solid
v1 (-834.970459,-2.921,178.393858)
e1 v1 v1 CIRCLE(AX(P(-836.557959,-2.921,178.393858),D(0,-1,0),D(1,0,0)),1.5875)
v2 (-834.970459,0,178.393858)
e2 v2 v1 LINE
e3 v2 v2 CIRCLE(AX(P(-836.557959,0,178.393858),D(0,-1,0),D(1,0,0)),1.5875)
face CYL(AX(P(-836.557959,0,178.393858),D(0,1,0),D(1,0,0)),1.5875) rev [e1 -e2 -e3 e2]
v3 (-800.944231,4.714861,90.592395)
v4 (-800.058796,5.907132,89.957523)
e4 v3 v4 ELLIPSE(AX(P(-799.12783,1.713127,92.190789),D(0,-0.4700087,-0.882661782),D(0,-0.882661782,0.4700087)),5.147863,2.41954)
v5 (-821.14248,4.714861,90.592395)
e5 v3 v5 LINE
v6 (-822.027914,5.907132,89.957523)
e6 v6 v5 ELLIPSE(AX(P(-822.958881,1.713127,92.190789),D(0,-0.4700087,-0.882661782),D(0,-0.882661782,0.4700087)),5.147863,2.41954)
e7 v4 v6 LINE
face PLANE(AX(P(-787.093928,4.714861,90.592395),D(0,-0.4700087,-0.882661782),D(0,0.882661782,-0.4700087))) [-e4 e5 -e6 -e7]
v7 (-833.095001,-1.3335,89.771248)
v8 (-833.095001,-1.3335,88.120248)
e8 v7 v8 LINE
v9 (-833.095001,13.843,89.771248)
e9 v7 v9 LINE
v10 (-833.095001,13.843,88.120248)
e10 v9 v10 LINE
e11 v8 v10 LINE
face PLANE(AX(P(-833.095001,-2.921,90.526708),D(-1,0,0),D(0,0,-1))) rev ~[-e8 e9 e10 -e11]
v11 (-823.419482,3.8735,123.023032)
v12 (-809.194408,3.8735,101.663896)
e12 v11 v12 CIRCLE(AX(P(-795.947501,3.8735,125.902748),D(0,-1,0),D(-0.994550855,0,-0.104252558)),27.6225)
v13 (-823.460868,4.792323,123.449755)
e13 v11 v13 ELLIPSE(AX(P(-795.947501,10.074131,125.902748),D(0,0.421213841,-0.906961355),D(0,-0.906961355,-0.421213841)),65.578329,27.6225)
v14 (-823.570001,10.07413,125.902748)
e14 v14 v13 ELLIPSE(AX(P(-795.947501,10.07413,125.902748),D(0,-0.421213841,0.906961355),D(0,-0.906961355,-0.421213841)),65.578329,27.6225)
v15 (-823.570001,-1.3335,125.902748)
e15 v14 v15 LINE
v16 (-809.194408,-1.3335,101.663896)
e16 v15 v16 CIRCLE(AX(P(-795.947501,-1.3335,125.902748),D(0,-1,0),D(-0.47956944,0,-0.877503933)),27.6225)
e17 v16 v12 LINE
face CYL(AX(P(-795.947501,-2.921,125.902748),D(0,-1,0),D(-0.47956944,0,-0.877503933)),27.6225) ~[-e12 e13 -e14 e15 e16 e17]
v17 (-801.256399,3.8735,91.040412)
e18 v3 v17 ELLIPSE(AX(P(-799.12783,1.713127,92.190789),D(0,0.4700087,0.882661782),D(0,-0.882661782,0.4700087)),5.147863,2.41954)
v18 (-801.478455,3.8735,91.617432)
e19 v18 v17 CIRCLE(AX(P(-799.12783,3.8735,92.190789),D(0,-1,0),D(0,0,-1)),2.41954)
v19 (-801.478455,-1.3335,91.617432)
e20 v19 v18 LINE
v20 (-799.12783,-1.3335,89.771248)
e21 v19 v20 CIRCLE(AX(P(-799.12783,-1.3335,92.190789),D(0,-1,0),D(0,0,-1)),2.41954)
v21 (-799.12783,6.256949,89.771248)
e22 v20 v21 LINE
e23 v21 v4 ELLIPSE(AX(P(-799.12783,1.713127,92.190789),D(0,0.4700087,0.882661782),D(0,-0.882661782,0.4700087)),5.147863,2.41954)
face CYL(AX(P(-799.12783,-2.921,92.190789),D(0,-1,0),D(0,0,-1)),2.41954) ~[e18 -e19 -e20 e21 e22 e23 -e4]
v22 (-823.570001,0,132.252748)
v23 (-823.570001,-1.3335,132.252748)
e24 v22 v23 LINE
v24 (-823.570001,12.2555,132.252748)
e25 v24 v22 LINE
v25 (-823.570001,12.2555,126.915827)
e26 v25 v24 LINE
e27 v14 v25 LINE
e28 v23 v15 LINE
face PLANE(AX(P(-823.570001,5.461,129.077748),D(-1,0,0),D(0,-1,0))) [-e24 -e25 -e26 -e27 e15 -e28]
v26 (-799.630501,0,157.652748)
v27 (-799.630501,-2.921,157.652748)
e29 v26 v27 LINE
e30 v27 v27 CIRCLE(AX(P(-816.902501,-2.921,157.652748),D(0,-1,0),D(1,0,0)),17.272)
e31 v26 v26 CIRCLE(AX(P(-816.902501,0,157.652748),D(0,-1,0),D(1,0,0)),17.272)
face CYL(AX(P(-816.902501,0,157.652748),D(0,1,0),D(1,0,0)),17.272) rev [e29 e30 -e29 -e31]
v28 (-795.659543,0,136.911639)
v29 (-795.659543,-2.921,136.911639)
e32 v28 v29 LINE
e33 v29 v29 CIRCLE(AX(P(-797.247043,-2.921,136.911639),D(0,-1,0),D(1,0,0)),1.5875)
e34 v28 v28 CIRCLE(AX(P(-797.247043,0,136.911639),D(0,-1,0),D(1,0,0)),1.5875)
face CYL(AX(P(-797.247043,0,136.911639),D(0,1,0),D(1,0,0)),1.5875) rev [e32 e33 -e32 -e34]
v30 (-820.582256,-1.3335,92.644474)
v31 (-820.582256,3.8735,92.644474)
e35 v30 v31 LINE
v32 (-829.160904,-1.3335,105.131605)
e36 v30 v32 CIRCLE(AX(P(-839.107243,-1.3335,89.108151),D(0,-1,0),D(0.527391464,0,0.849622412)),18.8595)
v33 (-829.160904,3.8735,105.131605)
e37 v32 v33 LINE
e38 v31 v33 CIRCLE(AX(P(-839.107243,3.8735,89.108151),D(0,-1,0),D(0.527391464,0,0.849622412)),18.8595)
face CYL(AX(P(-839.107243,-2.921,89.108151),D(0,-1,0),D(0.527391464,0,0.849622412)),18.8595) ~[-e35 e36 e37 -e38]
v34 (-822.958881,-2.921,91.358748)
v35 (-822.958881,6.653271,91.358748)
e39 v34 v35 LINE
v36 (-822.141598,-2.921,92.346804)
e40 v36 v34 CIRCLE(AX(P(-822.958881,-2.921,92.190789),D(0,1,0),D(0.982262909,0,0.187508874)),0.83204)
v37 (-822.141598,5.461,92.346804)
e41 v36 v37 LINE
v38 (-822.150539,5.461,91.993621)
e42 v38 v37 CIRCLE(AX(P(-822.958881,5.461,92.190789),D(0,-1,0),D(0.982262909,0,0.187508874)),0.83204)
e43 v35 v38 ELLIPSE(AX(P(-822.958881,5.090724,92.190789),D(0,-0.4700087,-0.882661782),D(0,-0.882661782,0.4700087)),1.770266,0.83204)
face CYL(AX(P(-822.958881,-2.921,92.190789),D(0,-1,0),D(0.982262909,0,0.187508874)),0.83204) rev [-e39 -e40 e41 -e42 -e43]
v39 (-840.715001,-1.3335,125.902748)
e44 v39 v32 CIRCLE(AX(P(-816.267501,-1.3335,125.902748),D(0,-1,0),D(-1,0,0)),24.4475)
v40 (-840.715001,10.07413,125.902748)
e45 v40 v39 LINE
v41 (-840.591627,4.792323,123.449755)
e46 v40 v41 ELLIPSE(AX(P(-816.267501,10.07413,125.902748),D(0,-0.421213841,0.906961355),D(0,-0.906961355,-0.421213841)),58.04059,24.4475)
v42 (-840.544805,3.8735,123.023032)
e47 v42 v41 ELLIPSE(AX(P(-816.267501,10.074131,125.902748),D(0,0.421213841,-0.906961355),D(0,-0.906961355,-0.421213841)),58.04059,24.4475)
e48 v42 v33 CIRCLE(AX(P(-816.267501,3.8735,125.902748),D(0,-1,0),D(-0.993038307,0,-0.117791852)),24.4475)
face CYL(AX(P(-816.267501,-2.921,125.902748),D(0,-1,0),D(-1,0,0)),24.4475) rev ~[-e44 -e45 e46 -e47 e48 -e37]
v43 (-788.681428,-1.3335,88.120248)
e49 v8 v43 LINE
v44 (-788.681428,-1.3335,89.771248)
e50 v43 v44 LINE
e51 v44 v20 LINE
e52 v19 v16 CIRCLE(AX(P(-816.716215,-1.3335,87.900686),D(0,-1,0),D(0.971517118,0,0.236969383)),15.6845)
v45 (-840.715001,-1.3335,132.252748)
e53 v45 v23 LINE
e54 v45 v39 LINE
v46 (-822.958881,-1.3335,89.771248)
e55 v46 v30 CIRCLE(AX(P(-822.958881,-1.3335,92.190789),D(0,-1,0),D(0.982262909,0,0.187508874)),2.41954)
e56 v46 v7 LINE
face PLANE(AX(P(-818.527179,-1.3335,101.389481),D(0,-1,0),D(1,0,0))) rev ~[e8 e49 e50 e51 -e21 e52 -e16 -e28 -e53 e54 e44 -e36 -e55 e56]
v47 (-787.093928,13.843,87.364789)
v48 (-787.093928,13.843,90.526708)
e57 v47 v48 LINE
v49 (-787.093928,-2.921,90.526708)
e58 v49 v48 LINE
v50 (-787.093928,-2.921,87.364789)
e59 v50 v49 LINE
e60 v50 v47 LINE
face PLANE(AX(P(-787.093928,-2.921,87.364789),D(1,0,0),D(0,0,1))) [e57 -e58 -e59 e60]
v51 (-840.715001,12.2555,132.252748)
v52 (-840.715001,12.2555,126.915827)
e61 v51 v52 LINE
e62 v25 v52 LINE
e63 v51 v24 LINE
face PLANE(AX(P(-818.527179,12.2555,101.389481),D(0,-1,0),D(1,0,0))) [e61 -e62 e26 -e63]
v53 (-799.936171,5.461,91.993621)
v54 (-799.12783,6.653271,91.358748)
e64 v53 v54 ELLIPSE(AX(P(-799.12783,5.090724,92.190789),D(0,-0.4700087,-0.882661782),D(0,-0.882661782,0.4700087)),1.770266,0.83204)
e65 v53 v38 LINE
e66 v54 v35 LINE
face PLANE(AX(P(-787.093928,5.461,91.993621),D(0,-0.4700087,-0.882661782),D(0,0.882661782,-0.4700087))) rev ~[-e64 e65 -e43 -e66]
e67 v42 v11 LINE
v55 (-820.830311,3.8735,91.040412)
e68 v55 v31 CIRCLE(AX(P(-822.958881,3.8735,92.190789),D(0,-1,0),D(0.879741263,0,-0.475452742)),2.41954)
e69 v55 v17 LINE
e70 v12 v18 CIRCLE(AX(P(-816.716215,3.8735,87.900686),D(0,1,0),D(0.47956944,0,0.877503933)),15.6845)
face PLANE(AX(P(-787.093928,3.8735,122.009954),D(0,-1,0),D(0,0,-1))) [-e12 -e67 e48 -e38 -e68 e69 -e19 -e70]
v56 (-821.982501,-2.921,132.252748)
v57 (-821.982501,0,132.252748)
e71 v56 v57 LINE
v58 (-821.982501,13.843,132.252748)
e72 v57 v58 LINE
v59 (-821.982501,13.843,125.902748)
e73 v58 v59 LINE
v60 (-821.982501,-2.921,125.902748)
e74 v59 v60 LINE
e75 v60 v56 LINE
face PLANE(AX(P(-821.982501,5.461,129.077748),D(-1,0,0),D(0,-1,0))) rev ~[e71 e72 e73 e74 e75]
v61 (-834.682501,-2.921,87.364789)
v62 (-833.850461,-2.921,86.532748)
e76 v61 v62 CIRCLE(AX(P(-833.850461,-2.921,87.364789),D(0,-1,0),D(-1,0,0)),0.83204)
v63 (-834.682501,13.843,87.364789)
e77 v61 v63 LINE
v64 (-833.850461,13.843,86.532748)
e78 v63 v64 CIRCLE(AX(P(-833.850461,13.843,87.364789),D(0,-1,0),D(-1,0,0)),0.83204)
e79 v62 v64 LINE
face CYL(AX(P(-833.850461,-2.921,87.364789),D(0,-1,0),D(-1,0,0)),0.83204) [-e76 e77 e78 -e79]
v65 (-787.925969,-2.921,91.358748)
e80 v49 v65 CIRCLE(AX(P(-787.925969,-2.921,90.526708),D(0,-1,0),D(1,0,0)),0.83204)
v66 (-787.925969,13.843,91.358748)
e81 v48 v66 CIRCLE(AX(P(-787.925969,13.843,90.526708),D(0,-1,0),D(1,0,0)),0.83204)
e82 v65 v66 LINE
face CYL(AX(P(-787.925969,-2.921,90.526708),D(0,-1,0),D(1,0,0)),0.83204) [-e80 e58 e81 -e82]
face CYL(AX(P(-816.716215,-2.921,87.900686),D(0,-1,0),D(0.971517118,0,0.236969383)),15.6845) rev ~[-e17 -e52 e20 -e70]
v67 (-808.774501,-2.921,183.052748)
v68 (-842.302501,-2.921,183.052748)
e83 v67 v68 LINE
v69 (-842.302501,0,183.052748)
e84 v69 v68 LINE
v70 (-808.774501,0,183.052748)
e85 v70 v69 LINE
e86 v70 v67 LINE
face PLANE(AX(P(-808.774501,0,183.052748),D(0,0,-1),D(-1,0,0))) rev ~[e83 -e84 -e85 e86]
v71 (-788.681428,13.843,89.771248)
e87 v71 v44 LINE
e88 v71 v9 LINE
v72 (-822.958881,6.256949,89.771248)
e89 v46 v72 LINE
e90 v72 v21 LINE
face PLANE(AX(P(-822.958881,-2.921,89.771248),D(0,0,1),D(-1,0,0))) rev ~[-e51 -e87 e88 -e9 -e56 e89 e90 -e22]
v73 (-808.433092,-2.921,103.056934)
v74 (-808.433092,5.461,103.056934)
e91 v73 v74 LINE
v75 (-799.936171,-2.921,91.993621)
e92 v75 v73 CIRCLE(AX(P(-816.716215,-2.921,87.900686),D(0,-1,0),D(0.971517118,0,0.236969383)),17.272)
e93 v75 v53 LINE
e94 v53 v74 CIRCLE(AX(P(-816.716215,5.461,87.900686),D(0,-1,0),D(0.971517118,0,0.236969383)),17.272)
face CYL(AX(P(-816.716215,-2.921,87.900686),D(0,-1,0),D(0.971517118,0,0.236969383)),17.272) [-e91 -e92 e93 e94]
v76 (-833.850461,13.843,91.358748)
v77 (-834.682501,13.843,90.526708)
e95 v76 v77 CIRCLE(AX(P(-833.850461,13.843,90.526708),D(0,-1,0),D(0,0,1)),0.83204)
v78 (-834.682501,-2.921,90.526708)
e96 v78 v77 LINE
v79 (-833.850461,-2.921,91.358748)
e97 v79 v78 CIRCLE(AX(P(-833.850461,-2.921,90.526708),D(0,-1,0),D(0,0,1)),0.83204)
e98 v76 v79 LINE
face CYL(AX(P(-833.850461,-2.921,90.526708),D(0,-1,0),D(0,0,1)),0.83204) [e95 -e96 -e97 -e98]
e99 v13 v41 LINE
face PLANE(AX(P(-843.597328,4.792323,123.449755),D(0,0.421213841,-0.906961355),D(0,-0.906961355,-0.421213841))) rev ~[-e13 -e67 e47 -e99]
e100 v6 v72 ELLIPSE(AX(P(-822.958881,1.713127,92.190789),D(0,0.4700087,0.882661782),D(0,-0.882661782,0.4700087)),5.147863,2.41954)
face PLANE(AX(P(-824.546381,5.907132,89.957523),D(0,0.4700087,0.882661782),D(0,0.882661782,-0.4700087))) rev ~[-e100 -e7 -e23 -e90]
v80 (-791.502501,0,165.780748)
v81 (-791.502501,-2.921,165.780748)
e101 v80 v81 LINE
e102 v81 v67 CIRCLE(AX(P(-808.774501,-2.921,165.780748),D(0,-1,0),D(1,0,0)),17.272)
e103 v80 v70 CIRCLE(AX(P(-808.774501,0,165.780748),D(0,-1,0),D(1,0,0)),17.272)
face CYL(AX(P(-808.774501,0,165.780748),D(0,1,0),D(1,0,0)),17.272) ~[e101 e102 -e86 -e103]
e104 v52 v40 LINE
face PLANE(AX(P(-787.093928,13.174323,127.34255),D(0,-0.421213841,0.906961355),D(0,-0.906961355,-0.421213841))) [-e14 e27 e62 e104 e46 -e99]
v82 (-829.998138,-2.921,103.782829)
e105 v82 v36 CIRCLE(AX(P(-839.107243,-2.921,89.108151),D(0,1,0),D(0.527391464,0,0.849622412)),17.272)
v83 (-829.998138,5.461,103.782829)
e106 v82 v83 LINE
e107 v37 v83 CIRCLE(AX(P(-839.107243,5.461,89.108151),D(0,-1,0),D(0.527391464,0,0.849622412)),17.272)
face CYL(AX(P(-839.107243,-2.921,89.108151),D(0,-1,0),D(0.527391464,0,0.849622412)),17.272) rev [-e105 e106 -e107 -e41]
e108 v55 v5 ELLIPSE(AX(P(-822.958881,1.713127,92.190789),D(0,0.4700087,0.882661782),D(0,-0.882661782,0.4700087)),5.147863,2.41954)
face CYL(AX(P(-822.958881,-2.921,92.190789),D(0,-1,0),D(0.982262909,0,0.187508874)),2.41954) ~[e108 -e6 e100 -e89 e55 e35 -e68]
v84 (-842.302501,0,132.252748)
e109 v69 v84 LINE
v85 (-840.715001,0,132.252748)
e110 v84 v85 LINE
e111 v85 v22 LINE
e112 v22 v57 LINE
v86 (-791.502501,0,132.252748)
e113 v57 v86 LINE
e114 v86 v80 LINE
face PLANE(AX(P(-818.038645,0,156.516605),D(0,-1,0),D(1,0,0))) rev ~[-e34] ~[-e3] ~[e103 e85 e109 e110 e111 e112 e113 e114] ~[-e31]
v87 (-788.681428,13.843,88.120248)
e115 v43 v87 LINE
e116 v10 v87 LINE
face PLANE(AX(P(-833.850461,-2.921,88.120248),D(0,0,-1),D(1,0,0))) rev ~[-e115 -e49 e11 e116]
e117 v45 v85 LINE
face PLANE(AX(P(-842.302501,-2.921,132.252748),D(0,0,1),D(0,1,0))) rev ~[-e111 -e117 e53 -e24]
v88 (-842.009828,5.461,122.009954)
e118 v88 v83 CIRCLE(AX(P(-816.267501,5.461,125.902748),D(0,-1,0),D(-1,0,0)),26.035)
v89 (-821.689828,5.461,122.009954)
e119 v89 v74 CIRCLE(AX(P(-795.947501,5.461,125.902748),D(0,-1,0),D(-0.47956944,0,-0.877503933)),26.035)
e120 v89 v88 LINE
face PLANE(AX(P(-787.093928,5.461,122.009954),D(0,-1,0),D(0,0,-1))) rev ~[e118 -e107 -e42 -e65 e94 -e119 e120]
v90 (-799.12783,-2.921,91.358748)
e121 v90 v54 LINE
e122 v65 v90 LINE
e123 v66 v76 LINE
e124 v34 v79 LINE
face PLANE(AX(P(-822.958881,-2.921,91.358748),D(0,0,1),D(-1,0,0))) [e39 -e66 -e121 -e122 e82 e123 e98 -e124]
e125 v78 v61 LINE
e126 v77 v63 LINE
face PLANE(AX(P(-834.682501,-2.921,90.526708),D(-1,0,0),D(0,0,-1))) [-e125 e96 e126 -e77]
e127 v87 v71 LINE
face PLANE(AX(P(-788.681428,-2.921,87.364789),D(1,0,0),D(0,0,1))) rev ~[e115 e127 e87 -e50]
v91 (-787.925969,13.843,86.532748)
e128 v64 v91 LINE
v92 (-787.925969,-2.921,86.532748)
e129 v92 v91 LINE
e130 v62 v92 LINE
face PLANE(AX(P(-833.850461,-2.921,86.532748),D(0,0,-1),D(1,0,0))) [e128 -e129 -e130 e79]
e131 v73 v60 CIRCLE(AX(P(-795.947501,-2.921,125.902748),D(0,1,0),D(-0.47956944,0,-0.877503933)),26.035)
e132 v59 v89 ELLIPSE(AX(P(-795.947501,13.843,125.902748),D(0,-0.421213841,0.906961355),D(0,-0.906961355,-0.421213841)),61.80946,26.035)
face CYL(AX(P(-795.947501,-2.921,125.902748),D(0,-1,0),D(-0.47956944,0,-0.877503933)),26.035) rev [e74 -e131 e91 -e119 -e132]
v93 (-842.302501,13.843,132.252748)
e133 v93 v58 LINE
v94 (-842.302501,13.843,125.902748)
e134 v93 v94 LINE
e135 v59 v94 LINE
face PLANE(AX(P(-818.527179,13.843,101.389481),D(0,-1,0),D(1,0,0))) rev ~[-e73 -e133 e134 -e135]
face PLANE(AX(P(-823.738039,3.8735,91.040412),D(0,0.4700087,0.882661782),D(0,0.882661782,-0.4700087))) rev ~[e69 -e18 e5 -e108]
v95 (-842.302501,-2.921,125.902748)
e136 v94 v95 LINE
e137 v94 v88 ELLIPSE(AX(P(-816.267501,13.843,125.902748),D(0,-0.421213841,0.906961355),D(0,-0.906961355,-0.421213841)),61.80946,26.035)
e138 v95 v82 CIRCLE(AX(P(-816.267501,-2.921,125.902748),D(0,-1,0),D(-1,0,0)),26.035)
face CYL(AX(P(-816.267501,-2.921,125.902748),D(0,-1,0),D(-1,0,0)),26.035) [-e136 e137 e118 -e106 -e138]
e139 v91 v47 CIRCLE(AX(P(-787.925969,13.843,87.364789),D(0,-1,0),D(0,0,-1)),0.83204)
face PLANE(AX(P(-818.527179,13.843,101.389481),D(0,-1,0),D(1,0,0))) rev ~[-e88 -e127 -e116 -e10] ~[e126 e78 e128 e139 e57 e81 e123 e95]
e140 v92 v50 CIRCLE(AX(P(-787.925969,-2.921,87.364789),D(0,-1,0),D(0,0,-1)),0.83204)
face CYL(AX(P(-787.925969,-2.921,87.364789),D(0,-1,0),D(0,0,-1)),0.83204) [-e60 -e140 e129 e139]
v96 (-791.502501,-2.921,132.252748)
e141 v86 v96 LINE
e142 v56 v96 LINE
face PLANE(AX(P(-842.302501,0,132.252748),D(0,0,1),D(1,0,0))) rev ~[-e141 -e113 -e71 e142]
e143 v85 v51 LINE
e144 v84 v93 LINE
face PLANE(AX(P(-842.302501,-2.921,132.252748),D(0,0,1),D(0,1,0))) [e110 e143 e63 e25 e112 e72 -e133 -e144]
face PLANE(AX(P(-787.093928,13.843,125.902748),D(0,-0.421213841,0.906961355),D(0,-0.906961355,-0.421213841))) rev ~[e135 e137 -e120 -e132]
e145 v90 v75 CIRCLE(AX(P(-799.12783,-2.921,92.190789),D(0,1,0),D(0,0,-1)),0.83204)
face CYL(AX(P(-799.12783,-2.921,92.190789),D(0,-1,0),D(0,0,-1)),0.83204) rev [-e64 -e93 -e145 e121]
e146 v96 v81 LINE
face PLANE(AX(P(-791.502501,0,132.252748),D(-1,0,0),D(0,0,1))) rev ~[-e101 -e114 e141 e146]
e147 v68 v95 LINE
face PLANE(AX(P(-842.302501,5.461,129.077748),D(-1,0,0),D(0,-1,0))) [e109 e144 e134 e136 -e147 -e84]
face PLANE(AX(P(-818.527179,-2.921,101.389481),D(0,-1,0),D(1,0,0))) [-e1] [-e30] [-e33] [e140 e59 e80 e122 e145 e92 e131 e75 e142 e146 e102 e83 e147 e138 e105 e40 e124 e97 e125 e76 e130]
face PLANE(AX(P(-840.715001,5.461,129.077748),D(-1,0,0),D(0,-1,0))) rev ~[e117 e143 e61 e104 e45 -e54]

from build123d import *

# Parameters (mm, degrees)
F0_R        = 1.5875
F0_R_2      = 17.272
F1_DEPTH    = 2.921
F3_DEPTH    = 20.32
F5_DEPTH    = 16.764
F7_DEPTH    = 55.2085729102
F8_T        = 1.5875
F8_T3_DEPTH = 6.096
F8_T5_DEPTH = 23.495
F8_T7_DEPTH = 25.3893680424
F8_T9_DEPTH = 27.0060511967


# Not quite as in the source:
# - a shell that OpenCascade refuses in one call is made with other operations: the cavity is built on its own and cut out


with BuildPart() as f1:
    # F0 (on Front) → F1 (new body)
    with BuildSketch(Plane.XZ):
        with BuildLine():
            Line((-808.7745012016, 183.0527484417), (-842.3025012016, 183.0527484417))
            Line((-842.3025012016, 183.0527484417), (-842.3025012016, 132.2527484417))
            Line((-842.3025012016, 132.2527484417), (-791.5025012016, 132.2527484417))
            Line((-791.5025012016, 132.2527484417), (-791.5025012016, 165.7807484417))
            ThreePointArc((-791.5025012016, 165.7807484417), (-796.561352877, 177.9938967664), (-808.7745012016, 183.0527484417))
        make_face()
        with Locations((-797.2470434503, 136.9116393686)):
            Circle(F0_R, mode=Mode.SUBTRACT)
        with Locations((-816.9025012016, 157.6527484417)):
            Circle(F0_R_2, mode=Mode.SUBTRACT)
        with Locations((-836.557958953, 178.3938575148)):
            Circle(F0_R, mode=Mode.SUBTRACT)
    extrude(amount=F1_DEPTH)

    # F2 (on face) → F3 (join)
    with BuildSketch(Plane(origin=(-842.3025012016, 0, 0), x_dir=(0, -1, 0), z_dir=(-1, 0, 0))):
        Polygon((2.921, 125.9027484417), (2.921, 132.2527484417), (0, 132.2527484417), (-13.843, 132.2527484417), (-13.843, 125.9027484417), align=None)
    extrude(amount=-F3_DEPTH)

    # F4 (on face) → F5 (join, through all)
    with BuildSketch(Plane.XZ.offset(2.921)):
        with BuildLine():
            Line((-821.9825012016, 125.9027484417), (-842.3025012016, 125.9027484417))
            ThreePointArc((-842.3025012016, 125.9027484417), (-839.0194061041, 113.2468388218), (-829.9981379746, 103.782828939))
            ThreePointArc((-829.9981379746, 103.782828939), (-824.8710634373, 98.8883942721), (-822.1415983833, 92.3468039044))
            ThreePointArc((-822.1415983833, 92.3468039044), (-822.3177482435, 91.6604679901), (-822.9588808932, 91.3587484417))
            Line((-822.9588808932, 91.3587484417), (-833.8504607139, 91.3587484417))
            ThreePointArc((-833.8504607139, 91.3587484417), (-834.438802185, 91.115049425), (-834.6825012016, 90.5267079539))
            Line((-834.6825012016, 90.5267079539), (-834.6825012016, 87.3647889295))
            ThreePointArc((-834.6825012016, 87.3647889295), (-834.438802185, 86.7764474583), (-833.8504607139, 86.5327484417))
            Line((-833.8504607139, 86.5327484417), (-787.9259687792, 86.5327484417))
            ThreePointArc((-787.9259687792, 86.5327484417), (-787.337627308, 86.7764474583), (-787.0939282914, 87.3647889295))
            Line((-787.0939282914, 87.3647889295), (-787.0939282914, 90.5267079539))
            ThreePointArc((-787.0939282914, 90.5267079539), (-787.337627308, 91.115049425), (-787.9259687792, 91.3587484417))
            Line((-787.9259687792, 91.3587484417), (-799.1278296965, 91.3587484417))
            ThreePointArc((-799.1278296965, 91.3587484417), (-799.6417555246, 91.5364406915), (-799.9361712736, 91.9936208083))
            ThreePointArc((-799.9361712736, 91.9936208083), (-803.0180469013, 98.4212453171), (-808.4330915744, 103.0569335505))
            ThreePointArc((-808.4330915744, 103.0569335505), (-818.3403970657, 112.6219563033), (-821.9825012016, 125.9027484417))
        make_face()
    extrude(amount=-F5_DEPTH)

    # F6 (on face) → F7 (cut, through all)
    with BuildSketch(Plane.YZ.offset(-787.0939282914)):
        Polygon((13.843, 91.3587484417), (13.843, 125.9027484417), (5.461, 122.0099536731), (5.461, 91.9936208083), (6.6532706411, 91.3587484417), align=None)
    extrude(amount=-F7_DEPTH, mode=Mode.SUBTRACT)

    # F8: shell of thickness 1.5875, made by hand


with BuildPart() as f8_core1:
    # F8_t2: copy of F1
    add(f1.part)

    # the walls: a layer under each face that stays
    f8_faces = [f8_core1.faces().sort_by_distance(p)[0] for p in [
        (-825.5385012016, -1.4605, 183.0527484417),
        (-814.6982147465, -2.921, 134.7927484417),
        (-838.145458953, -1.4605, 178.3938575148),
        (-834.1745012016, -1.4605, 157.6527484417),
        (-798.8345434503, -1.4605, 136.9116393686),
        (-791.5025012016, -1.4605, 149.0167484417),
        (-806.7425012016, -1.4605, 132.2527484417),
        (-821.9825012016, 5.461, 129.0777484417),
        (-832.1425012016, 13.843, 129.0777484417),
        (-831.9961644541, 9.652, 123.9563510574),
        (-820.9729994901, 5.461, 107.0017872407),
        (-811.0433552949, 6.0571353205, 91.676184625),
        (-812.2898246487, -0.127, 105.6357879061),
        (-803.0180469013, 1.27, 98.4212453171),
        (-799.6417555246, 1.8661353205, 91.5364406915),
        (-787.0939282914, 5.461, 88.9457484417),
        (-810.8882147465, 5.461, 86.5327484417),
        (-834.6825012016, 5.461, 88.9457484417),
        (-795.5800507683, 11.049, 91.3587484417),
        (-822.3177482435, 1.8661353205, 91.6604679901),
        (-824.8710634373, 1.27, 98.8883942721),
        (-841.9306657608, -0.127, 121.5183203365),
        (-833.835834535, 0, 140.7194151084),
        (-842.3025012016, -0.127, 173.5277484417),
        (-796.561352877, -1.4605, 177.9938967664),
    ]]
    thicken(f8_faces, amount=-F8_T, mode=Mode.SUBTRACT)

    # F8_s4 → F8_t3 (cut)
    with BuildSketch(Plane.XZ.offset(-1.5875)):
        Polygon((-821.9666262016, 132.2368734417), (-821.9825012016, 133.8402484417), (-823.5700012016, 133.8402484417), (-823.5700012016, 132.2527484417), align=None)
    extrude(amount=F8_T3_DEPTH, mode=Mode.SUBTRACT)

    # F8_s6 → F8_t5 (cut)
    with BuildSketch(Plane.YZ.offset(-843.5973277066)):
        Polygon((5.4835617697, 121.9955556616), (4.7923230267, 123.4497548244), (3.8735, 123.0230321483), (3.8735, 122.0099536731), align=None)
    extrude(amount=F8_T5_DEPTH, mode=Mode.SUBTRACT)

    # F8_s8 → F8_t7 (cut)
    with BuildSketch(Plane.YZ.offset(-823.7380393161)):
        Polygon((5.4843363881, 92.0076330641), (3.8735, 91.9936208083), (3.8735, 91.0404117704), (4.7148611881, 90.5923952293), align=None)
    extrude(amount=F8_T7_DEPTH, mode=Mode.SUBTRACT)

    # F8_s10 → F8_t9 (cut)
    with BuildSketch(Plane.YZ.offset(-824.5463808932)):
        Polygon((6.6607320292, 91.3886356975), (5.9071318292, 89.9575228626), (6.2569494224, 89.7712484417), (6.6532706411, 89.7712484417), align=None)
    extrude(amount=F8_T9_DEPTH, mode=Mode.SUBTRACT)


with BuildPart() as f1_1:
    add(f1.part)

    # what is left inside the walls is the cavity
    f8_cavity = [f8_core1.part.solids().sort_by_distance(p)[0] for p in [
        (-814.698215, -1.317625, 102.831082),
    ]]
    add(f8_cavity, mode=Mode.SUBTRACT)


solid = f1_1.part
